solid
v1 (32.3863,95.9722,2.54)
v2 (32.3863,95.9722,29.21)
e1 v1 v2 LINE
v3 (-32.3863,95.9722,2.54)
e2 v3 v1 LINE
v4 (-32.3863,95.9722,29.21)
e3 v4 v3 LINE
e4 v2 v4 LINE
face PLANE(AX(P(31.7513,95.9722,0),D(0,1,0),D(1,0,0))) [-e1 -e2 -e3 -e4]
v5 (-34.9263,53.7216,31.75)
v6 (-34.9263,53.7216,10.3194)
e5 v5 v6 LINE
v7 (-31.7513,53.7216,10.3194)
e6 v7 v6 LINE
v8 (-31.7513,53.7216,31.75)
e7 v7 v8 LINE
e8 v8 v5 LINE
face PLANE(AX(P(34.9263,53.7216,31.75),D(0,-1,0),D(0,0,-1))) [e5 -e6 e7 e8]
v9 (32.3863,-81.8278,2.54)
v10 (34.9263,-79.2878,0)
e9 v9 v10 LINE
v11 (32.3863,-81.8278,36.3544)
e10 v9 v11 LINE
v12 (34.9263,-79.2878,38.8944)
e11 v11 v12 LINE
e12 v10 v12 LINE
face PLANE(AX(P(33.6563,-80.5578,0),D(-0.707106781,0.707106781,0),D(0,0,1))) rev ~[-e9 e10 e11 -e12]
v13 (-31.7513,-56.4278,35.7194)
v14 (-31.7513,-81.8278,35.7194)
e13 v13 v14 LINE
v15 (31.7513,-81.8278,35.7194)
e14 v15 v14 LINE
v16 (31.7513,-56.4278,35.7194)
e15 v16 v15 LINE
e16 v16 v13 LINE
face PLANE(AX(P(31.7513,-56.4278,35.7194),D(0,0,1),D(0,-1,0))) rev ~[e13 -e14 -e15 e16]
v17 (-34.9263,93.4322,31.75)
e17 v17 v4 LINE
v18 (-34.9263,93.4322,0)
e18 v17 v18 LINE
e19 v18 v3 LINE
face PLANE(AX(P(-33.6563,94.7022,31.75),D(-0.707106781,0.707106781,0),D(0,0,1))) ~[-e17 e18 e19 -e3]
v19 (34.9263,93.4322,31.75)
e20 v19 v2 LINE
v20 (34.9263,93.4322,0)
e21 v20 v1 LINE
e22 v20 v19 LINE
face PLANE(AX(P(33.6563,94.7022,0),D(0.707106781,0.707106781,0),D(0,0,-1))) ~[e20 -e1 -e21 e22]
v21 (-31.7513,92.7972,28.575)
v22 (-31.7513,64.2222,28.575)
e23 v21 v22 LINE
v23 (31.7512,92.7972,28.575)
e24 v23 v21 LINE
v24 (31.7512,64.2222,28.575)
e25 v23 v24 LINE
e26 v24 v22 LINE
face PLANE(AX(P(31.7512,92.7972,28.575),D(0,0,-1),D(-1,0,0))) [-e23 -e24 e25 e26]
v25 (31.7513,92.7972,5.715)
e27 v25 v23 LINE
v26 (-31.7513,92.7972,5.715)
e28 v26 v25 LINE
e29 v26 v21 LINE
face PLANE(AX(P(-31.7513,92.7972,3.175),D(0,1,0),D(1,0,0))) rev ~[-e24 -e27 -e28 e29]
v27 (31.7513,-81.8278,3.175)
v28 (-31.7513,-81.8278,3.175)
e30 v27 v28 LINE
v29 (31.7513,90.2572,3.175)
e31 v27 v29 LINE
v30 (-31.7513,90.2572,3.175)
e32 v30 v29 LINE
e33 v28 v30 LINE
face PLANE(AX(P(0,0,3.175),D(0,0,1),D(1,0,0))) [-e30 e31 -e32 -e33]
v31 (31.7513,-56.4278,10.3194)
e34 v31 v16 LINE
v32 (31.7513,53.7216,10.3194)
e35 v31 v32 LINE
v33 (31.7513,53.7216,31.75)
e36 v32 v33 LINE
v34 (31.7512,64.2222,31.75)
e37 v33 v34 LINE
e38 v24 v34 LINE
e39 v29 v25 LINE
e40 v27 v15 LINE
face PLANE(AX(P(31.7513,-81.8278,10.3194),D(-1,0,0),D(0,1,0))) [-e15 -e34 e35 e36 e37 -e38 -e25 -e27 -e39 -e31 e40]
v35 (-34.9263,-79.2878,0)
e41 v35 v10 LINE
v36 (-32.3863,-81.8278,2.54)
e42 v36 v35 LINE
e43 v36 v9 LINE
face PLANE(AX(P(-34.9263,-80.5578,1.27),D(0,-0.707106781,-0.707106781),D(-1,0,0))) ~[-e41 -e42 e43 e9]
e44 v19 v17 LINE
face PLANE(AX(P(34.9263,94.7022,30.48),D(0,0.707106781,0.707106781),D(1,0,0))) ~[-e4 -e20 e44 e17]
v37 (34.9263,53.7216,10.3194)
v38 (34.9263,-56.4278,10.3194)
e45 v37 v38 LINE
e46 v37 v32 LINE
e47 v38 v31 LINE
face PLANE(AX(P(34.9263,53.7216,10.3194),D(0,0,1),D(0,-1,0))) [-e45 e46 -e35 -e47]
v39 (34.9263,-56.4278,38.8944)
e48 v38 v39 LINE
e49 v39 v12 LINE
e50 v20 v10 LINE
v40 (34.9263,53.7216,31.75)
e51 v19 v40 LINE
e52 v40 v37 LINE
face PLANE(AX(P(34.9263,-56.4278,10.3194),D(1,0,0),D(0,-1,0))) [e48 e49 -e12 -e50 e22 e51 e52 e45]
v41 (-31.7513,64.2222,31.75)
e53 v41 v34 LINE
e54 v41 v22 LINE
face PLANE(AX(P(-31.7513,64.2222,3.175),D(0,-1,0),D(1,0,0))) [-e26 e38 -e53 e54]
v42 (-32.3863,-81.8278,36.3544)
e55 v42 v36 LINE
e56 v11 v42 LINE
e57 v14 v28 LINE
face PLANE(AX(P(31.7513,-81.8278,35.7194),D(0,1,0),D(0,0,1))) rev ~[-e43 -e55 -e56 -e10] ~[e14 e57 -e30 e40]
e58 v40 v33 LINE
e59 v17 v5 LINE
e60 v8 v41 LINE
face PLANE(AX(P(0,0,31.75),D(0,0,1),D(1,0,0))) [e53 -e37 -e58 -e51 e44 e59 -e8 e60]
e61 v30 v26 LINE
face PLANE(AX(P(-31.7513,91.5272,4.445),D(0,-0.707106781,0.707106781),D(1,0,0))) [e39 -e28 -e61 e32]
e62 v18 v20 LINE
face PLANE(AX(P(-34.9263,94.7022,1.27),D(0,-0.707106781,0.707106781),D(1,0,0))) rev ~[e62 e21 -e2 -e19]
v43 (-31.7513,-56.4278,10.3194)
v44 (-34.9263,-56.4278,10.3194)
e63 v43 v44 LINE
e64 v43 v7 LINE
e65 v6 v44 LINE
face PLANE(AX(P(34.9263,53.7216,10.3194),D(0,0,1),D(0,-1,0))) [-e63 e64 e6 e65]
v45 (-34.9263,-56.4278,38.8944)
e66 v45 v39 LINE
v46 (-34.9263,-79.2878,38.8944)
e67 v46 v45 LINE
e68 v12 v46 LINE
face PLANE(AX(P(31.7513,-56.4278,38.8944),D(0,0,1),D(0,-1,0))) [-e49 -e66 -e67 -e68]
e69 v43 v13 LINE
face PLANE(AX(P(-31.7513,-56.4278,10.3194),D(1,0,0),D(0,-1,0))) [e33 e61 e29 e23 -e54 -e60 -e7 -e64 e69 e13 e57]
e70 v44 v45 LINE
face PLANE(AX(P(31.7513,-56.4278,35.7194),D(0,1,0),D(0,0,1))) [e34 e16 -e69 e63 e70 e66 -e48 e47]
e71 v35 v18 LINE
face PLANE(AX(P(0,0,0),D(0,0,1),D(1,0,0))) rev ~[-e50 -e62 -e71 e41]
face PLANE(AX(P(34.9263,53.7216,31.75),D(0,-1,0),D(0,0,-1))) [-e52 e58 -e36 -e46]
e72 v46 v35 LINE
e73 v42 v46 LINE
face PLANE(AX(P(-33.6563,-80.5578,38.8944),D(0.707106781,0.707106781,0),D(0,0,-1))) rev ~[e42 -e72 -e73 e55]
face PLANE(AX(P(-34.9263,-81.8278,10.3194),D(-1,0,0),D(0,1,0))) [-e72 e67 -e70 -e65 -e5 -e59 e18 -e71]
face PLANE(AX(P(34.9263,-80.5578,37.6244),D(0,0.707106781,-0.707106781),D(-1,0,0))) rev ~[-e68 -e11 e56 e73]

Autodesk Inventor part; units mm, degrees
ref_plane "YZ Plane" through (0, 0, 0) normal (1, 0, 0) x (0, 1, 0)
ref_plane "XZ Plane" through (0, 0, 0) normal (0, 1, 0) x (-1, 0, 0)
ref_plane "XY Plane" through (0, 0, 0) normal (0, 0, 1) x (1, 0, 0)
sketch "Sketch1" plane through (0, 0, 0) normal (0, 0, 1) x (1, 0, 0)
  arc A0 (49.1564, -72.9751) -> (-49.1564, -72.9751) centre (0, -254.0664) ccw
  line L0 (49.1564, -72.9751) -> (73.0086, -49.1229)
  line L1 (86.9345, 13.6367) -> (74.7113, 47.4192)
  line L2 (74.7113, 47.4192) -> (49.163, 72.9816)
  line L3 (-49.163, 72.9816) -> (-75.1179, 47.041)
  line L4 (-75.1179, 47.041) -> (-86.9513, 13.6826)
  line L5 (-49.1564, -72.9751) -> (-73.0086, -49.1229)
  arc A1 (-49.163, 72.9816) -> (49.163, 72.9816) centre (0, 254.0664) ccw
  arc A2 (-73.0086, -49.1229) -> (-86.9513, 13.6826) centre (-146.4572, -32.478) ccw
  arc A3 (86.9345, 13.6367) -> (73.0086, -49.1229) centre (146.4645, -32.4974) ccw
  line L6 (0, 0) -> (0, -66.422)
  line L7 (0, 0) -> (0, 66.4266)
  line L8 (78.5091, -0.0284) -> (-78.4957, -0.0284)
  line L9 (-49.163, 72.9816) -> (49.163, 72.9816)
  line L10 (-49.163, 72.9816) -> (-31.7513, 72.9816)
  line L11 (-31.7513, 72.9816) -> (-31.7513, -69.1278)
  line L12 (49.163, 72.9816) -> (31.7513, 72.9816)
  line L13 (31.7513, 72.9816) -> (31.7513, -69.1278)
  line L14 (31.7513, -69.1278) -> (31.7513, 95.9722)
  line L15 (31.7513, 95.9722) -> (-31.7513, 95.9722)
  line L16 (-31.7513, 95.9722) -> (-31.7513, 72.9816)
  line L17 (31.7513, -69.1278) -> (31.7513, -81.8278)
  line L18 (31.7513, -81.8278) -> (-31.7513, -81.8278)
  line L19 (-31.7513, -81.8278) -> (-31.7513, -69.1278)
  line L20 (31.7513, 95.9722) -> (34.9263, 95.9722)
  line L21 (34.9263, 95.9722) -> (34.9263, -81.8278)
  line L22 (34.9263, -81.8278) -> (31.7513, -81.8278)
  line L23 (-31.7513, 95.9722) -> (-34.9263, 95.9722)
  line L24 (-34.9263, 95.9722) -> (-34.9263, -81.8278)
  line L25 (-34.9263, -81.8278) -> (-31.7513, -81.8278)
  line L26 (31.7513, 95.9722) -> (31.7513, 92.7972)
  line L27 (31.7513, 92.7972) -> (-31.7513, 92.7972)
extrude "Extrusion1" add sketch "Sketch1" along normal blind 3.175 contours L17 L18 L19 A0 | L13 L8 L21 A0 | A0 L6 L8 L13 | A0 L21 L22 L17 | A0 L11 L8 L6 | L13 A1 L21 L8 | L8 L6 L7 A1 L13 | L19 L25 L24 A0 | A0 L24 L8 L11 | L8 L11 A1 L7 L6 | L13 L9 L21 A1 | A1 L11 L9 L13 | L8 L24 A1 L11 | L14 L20 L21 L9 | L9 L16 L27 L14 | A1 L24 L9 L11 | L9 L24 L23 L16 | L27 L16 L15 L14
sketch "Sketch2" plane through (0, 0, 3.175) normal (0, 0, 1) x (1, 0, 0)
  line L0 (34.9263, 95.9722) -> (-34.9263, 95.9722) projected
  line L1 (-34.9263, 95.9722) -> (-34.9263, -81.8278) projected
  line L2 (-34.9263, -81.8278) -> (34.9263, -81.8278) projected
  line L3 (34.9263, -81.8278) -> (34.9263, 95.9722) projected
  line L4 (-34.9263, 95.9722) -> (-34.9263, 92.7972)
  line L5 (-34.9263, 92.7972) -> (34.9263, 92.7972)
  line L6 (34.9263, -81.8278) -> (31.7513, -81.8278)
  line L7 (31.7513, -81.8278) -> (31.7513, 92.7972)
  line L8 (-34.9263, -81.8278) -> (-31.7513, -81.8278)
  line L9 (-31.7513, -81.8278) -> (-31.7513, 92.7972)
  point P0 (0, 0)
  dimension "d9" = 3.175
  dimension "d10" = 3.175
  dimension "d11" = 3.175
extrude "Extrusion2" add sketch "Sketch2" along normal blind 28.575 contours L3 L5 L1 L0 | L3 L2 L7 L5 | L5 L9 L2 L1
sketch "Sketch3" plane through (-31.7513, 92.7972, 3.175) normal (0, -1, 0) x (1, 0, 0)
  line L0 (63.5025, 0) -> (63.5025, 28.575) projected
  line L1 (0, 28.575) -> (63.5025, 28.575) projected
  line L2 (0, 28.575) -> (0, 0) projected
  line L3 (63.5025, 28.575) -> (63.5025, 25.4)
  line L4 (63.5025, 25.4) -> (0, 25.4)
  point P0 (31.7513, -3.175)
  dimension "d14" = 3.175
extrude "Extrusion3" add sketch "Sketch3" along normal blind 28.575
sketch "Sketch4" plane through (34.9263, -81.8278, 0) normal (1, 0, 0) x (0, 0, -1)
  line L0 (-31.75, 0) -> (-31.75, 177.8) projected
  line L1 (0, 0) -> (-31.75, 0) projected
  line L2 (-31.75, 0) -> (-31.75, 135.5494)
  line L3 (-31.75, 135.5494) -> (-10.3194, 135.5494)
  line L4 (-10.3194, 135.5494) -> (-10.3194, 0)
  point P0 (0, 81.8278)
extrude "Extrusion4" cut sketch "Sketch4" against normal blind 127
sketch "Sketch5" plane through (34.9263, -81.8278, 10.3194) normal (0, 0, 1) x (1, 0, 0)
  line L0 (-3.175, 0) -> (-3.175, 135.5494) projected
  line L1 (0, 0) -> (-3.175, 0) projected
  line L2 (0, 135.5494) -> (0, 0) projected
  line L3 (0, 0) -> (0, 25.4)
  line L4 (0, 25.4) -> (-3.175, 25.4)
  point P0 (-34.9263, 81.8278)
  dimension "d19" = 25.4
sketch "Sketch6" plane through (-34.9263, 53.7216, 10.3194) normal (0, 0, 1) x (1, 0, 0)
  line L0 (3.175, 0) -> (3.175, -135.5494) projected
  line L1 (0, -135.5494) -> (0, 0) projected
  line L2 (3.175, -135.5494) -> (0, -135.5494) projected
  line L3 (3.175, -135.5494) -> (3.175, -110.1494)
  line L4 (3.175, -110.1494) -> (0, -110.1494)
  point P0 (34.9263, -53.7216)
  dimension "d20" = 25.4
extrude "Extrusion5" add sketch "Sketch6" along normal blind 28.575
extrude "Extrusion6" add sketch "Sketch5" along normal blind 28.575
sketch "Sketch7" plane through (31.7513, -81.8278, 3.175) normal (-1, 0, 0) x (0, 0, 1)
  line L0 (0, 0) -> (35.7194, 0) projected
  line L1 (35.7194, 25.4) -> (35.7194, 0) projected
  line L2 (7.1444, 25.4) -> (35.7194, 25.4) projected
  line L3 (35.7194, 25.4) -> (32.5444, 25.4)
  line L4 (32.5444, 25.4) -> (32.5444, 0)
  point P0 (-3.175, 81.8278)
  dimension "d25" = 3.175
extrude "Extrusion7" add sketch "Sketch7" along normal blind 66.04
chamfer "Chamfer1" distance 2.54 angle 45 5 edges at (0, 95.9722, 31.75) (-34.9263, 95.9722, 15.875) (0, 92.7972, 3.175) (34.9263, 95.9722, 15.875) (0, 95.9722, 0)
chamfer "Chamfer2" distance 2.54 angle 45 4 edges at (0, -81.8278, 38.8944) (0, -81.8278, 0) (-34.9263, -81.8278, 19.4472) (34.9263, -81.8278, 19.4472)
properties part number "Battery Holder"
